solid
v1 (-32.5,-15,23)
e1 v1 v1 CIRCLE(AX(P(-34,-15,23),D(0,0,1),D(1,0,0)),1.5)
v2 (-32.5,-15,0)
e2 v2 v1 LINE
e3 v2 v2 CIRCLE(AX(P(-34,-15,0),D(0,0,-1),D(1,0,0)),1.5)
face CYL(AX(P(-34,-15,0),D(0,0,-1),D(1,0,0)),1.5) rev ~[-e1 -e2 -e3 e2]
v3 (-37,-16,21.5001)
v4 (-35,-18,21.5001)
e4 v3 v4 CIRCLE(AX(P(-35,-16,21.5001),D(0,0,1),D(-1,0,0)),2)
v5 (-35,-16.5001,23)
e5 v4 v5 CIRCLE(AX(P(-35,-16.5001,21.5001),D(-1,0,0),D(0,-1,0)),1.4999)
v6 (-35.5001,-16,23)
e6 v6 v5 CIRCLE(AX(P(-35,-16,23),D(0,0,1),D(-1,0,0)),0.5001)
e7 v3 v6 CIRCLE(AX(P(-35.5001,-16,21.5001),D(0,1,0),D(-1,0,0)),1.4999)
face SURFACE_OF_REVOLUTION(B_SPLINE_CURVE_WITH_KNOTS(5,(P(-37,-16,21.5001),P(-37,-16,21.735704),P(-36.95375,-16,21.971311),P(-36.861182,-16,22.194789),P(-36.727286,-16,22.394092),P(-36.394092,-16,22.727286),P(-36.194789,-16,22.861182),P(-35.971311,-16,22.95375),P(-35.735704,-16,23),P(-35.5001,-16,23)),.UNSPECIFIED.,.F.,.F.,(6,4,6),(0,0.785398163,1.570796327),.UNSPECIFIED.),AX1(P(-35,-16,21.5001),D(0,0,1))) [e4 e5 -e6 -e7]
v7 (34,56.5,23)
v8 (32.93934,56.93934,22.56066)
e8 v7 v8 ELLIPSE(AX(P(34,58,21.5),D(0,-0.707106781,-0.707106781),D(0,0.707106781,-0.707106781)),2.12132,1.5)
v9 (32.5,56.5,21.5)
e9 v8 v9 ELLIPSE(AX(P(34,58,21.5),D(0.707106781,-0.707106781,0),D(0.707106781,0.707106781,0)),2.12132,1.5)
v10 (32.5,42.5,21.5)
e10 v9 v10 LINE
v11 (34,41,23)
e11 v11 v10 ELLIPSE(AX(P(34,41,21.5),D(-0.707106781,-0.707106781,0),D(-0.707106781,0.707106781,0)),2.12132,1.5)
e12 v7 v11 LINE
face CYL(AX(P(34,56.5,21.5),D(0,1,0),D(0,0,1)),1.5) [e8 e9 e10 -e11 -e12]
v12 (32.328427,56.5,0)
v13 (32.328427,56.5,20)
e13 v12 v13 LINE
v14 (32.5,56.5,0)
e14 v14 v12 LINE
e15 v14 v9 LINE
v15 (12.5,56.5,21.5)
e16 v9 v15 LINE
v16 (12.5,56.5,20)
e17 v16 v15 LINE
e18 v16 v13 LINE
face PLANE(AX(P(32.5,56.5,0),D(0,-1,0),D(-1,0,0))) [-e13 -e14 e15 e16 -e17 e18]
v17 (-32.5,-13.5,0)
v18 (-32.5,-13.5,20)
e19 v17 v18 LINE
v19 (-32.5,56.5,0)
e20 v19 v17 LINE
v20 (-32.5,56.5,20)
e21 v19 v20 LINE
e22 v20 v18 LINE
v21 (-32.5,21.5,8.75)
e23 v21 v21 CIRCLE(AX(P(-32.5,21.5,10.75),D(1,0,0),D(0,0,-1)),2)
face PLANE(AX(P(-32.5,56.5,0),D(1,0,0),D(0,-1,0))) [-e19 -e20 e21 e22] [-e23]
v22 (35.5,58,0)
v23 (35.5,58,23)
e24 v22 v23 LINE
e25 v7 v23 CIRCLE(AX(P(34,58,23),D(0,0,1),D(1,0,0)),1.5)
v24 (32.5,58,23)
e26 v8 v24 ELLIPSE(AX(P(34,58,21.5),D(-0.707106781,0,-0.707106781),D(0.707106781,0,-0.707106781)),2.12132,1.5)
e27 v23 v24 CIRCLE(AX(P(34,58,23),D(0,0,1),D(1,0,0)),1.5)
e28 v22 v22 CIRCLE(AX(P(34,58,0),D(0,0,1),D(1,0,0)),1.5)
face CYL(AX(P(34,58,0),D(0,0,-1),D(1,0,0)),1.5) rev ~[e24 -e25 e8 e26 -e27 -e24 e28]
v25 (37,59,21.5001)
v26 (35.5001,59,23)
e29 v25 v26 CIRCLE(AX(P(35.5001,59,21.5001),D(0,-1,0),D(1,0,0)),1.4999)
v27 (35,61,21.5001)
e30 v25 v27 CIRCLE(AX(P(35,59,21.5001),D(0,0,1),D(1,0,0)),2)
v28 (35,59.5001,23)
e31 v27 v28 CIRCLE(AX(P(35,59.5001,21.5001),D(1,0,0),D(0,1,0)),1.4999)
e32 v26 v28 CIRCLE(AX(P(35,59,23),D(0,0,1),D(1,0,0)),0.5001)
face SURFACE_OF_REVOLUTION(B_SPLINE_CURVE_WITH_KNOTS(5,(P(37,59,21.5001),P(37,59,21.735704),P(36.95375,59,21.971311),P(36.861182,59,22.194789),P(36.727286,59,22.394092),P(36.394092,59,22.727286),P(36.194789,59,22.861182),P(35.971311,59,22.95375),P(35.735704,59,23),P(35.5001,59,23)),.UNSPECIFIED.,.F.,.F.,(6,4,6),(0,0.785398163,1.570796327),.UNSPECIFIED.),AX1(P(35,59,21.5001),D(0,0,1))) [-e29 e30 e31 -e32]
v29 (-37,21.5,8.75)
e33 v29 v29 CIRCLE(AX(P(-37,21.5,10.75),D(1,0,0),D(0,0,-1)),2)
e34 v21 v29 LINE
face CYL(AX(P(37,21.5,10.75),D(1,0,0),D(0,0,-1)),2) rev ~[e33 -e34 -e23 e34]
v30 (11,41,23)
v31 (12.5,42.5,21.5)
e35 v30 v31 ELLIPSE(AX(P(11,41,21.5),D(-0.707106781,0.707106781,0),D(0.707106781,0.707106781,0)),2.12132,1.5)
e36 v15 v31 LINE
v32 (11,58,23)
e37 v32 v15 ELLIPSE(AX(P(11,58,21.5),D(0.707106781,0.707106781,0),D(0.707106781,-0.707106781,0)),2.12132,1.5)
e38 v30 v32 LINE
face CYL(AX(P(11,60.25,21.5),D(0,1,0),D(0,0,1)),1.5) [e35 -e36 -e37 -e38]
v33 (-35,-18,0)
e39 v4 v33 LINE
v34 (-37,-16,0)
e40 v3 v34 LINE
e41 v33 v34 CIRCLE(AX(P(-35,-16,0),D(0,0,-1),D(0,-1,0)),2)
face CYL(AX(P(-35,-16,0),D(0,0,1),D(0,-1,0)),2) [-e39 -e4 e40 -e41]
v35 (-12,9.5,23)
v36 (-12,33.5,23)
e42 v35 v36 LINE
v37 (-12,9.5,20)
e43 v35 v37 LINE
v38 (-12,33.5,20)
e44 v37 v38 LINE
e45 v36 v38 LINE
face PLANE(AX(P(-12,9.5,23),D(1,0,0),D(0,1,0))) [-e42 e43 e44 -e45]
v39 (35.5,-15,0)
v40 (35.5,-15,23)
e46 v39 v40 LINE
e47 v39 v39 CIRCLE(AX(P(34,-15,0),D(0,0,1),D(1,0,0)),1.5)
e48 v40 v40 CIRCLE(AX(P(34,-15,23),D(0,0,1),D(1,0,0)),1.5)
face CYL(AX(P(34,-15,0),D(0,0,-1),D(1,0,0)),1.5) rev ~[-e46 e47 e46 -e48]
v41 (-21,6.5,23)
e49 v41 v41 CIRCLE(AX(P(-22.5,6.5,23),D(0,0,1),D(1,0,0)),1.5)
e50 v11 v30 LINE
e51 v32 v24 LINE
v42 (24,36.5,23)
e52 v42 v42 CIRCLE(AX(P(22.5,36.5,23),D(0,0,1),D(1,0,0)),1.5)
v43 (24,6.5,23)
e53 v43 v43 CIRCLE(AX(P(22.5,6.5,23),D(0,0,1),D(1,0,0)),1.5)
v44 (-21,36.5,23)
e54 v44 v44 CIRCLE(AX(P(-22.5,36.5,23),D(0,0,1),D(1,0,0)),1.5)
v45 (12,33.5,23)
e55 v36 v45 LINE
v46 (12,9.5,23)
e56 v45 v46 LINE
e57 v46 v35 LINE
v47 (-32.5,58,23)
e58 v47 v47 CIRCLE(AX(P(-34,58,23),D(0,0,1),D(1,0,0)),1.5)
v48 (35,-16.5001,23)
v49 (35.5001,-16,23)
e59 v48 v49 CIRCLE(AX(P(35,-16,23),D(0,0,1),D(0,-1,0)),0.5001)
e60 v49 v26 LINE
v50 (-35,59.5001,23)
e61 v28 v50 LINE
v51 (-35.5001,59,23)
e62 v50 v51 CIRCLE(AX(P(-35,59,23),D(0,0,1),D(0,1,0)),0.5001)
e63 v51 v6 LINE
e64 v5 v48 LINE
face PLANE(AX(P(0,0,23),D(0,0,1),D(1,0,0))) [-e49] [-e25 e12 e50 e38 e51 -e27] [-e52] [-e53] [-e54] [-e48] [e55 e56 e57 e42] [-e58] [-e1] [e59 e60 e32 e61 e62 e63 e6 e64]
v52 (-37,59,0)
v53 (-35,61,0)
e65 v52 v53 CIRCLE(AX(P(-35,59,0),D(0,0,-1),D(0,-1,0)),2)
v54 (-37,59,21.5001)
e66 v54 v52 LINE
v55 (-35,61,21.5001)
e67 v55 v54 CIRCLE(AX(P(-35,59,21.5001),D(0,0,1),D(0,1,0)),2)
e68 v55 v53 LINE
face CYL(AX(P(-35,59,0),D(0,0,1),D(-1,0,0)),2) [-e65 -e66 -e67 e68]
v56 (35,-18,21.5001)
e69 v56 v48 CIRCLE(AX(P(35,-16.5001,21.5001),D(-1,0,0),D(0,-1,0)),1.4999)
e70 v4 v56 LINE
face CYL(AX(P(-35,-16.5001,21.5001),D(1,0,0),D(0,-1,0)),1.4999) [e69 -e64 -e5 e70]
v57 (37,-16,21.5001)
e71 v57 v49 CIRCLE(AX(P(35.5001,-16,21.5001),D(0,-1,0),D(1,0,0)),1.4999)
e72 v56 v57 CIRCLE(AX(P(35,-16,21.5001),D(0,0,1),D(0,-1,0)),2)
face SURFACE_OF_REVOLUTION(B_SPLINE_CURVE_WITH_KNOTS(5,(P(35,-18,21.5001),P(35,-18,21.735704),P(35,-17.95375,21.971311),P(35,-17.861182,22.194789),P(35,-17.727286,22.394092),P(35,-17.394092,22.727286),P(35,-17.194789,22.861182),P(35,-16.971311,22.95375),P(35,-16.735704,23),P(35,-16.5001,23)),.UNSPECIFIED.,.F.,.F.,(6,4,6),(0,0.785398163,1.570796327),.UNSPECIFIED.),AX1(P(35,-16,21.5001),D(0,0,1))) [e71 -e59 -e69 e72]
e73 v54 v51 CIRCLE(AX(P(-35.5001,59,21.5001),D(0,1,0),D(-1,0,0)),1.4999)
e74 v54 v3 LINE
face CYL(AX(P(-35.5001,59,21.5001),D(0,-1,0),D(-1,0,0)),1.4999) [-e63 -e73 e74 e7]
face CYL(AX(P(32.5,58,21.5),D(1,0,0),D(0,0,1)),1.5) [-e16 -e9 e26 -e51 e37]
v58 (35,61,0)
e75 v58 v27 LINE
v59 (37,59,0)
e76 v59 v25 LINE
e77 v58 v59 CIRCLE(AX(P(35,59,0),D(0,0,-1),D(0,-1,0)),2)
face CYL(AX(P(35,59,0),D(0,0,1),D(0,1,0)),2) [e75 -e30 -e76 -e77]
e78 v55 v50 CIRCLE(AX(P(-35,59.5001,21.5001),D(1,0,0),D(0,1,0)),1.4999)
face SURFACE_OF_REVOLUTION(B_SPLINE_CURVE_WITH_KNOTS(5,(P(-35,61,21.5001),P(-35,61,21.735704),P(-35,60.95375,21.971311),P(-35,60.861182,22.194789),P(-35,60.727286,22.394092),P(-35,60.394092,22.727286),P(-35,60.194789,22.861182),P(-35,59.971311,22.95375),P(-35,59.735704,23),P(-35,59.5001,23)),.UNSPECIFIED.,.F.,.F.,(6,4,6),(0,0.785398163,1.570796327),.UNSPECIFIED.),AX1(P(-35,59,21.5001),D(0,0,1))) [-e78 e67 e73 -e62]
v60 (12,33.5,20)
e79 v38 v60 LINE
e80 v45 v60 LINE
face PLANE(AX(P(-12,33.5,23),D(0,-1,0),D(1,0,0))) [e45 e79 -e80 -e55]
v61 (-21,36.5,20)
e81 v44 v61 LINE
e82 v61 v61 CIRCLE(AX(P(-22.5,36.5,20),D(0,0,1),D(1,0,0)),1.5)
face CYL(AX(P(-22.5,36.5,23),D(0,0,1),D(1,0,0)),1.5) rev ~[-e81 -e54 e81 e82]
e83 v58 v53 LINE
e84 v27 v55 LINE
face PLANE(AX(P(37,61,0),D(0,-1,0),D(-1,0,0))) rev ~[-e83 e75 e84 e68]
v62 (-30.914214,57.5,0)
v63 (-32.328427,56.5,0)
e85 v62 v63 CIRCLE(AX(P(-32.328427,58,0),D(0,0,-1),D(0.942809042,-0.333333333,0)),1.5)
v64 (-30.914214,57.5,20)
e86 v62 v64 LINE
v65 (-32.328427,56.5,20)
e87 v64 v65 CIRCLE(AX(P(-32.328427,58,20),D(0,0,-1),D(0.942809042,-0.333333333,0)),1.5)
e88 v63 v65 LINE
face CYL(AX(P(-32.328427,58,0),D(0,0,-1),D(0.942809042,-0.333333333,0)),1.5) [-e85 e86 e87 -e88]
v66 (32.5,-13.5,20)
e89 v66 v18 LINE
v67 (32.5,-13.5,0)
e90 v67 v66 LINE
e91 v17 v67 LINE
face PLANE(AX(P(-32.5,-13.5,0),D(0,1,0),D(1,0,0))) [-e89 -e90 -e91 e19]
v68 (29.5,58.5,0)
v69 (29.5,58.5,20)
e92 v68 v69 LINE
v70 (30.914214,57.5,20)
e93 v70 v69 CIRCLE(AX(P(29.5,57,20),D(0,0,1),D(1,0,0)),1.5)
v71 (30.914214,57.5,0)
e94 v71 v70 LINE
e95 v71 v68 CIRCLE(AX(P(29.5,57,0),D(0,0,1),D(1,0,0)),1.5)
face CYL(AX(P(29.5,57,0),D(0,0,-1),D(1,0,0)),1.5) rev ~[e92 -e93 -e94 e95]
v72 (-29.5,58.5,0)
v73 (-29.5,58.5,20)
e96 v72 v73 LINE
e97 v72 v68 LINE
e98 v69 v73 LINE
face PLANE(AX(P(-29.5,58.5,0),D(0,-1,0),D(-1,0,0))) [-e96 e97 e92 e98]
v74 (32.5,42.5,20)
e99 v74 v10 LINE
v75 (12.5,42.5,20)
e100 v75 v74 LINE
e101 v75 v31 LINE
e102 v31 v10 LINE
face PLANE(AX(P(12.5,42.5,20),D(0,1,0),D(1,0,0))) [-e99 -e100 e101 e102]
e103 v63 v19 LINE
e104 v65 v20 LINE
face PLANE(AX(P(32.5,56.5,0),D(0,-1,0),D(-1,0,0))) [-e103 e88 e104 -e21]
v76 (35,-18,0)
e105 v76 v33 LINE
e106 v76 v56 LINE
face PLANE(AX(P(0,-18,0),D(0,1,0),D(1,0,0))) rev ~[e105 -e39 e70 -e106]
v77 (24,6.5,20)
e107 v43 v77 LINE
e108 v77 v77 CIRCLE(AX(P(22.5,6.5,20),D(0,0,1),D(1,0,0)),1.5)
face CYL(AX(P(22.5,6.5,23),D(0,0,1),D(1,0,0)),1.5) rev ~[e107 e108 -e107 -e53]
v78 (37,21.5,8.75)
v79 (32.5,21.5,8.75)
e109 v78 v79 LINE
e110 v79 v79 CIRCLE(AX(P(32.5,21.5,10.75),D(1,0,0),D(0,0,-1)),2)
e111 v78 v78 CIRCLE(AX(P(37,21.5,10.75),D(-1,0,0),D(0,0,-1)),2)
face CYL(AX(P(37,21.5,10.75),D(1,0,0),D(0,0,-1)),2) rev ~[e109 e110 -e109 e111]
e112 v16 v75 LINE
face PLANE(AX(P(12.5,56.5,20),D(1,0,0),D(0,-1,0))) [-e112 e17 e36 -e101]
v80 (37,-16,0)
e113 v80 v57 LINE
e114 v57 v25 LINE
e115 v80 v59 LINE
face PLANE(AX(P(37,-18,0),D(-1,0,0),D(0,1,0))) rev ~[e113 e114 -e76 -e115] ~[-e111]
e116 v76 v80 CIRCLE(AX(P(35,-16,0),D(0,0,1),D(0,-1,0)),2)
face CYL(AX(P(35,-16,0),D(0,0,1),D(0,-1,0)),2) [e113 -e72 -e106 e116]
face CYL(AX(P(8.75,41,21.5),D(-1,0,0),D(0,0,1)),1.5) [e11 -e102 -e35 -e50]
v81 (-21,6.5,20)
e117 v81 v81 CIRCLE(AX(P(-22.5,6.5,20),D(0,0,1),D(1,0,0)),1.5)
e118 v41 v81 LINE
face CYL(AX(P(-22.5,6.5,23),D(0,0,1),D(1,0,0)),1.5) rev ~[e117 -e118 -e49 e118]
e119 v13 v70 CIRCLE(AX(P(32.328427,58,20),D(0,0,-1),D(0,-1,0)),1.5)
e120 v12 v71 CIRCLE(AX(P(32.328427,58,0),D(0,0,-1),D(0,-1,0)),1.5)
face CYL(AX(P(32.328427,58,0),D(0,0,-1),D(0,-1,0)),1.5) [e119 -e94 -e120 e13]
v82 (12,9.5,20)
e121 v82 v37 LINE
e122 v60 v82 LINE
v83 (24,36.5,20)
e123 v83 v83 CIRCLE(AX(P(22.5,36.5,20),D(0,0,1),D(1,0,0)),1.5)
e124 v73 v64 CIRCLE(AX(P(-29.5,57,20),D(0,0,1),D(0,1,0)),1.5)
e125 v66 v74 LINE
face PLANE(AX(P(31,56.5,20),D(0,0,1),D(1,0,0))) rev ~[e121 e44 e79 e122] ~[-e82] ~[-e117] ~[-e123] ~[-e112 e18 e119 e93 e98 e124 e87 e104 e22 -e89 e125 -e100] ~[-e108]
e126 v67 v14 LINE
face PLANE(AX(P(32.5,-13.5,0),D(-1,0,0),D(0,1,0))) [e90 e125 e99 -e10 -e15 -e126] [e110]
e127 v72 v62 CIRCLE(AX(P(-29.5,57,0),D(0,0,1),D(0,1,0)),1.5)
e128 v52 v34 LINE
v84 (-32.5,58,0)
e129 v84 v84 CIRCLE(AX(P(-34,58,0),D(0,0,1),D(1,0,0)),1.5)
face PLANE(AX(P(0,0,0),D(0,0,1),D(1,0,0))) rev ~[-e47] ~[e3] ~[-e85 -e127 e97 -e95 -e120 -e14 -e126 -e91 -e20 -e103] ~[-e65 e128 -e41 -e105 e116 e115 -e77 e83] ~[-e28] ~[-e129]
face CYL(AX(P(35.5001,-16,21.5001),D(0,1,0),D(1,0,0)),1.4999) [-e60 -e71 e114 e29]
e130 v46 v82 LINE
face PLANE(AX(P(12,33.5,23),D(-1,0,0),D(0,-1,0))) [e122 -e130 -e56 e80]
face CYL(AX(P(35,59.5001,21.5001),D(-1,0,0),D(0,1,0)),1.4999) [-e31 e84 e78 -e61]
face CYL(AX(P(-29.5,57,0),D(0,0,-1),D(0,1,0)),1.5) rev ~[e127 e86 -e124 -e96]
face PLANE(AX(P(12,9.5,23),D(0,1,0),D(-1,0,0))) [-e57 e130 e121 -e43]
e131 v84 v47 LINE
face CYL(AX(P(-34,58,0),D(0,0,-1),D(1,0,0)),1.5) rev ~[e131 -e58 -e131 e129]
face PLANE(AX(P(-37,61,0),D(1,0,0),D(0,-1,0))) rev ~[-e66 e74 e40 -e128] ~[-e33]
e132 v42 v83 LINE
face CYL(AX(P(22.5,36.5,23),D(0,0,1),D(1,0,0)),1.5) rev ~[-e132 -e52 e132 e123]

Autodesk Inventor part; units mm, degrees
ref_plane "YZ Plane" through (0, 0, 0) normal (1, 0, 0) x (0, 1, 0)
ref_plane "XZ Plane" through (0, 0, 0) normal (0, 1, 0) x (-1, 0, 0)
ref_plane "XY Plane" through (0, 0, 0) normal (0, 0, 1) x (1, 0, 0)
sketch "Sketch2" plane through (0, 0, 0) normal (0, 0, 1) x (1, 0, 0)
  line L0 (0, -40) -> (0, -15)
  line L1 (0, -15) -> (-34, -15)
  line L2 (-34, -15) -> (-34, 58)
  line L3 (-34, 58) -> (34, 58)
  line L4 (34, 58) -> (34, -15)
  line L5 (34, -15) -> (0, -15)
  circle A0 centre (-34, 58) radius 1.5
  circle A1 centre (34, 58) radius 1.5
  circle A2 centre (-34, -15) radius 1.5
  circle A3 centre (34, -15) radius 1.5
  line L6 (32.5, 56.5) -> (-32.5, 56.5)
  line L7 (-32.5, 56.5) -> (-32.5, -13.5)
  line L8 (-32.5, -13.5) -> (0, -13.5)
  line L9 (0, -13.5) -> (32.5, -13.5)
  line L10 (32.5, -13.5) -> (32.5, 56.5)
  line L11 (37, -18) -> (37, 61)
  line L12 (37, 61) -> (-37, 61)
  line L13 (-37, 61) -> (-37, -18)
  line L14 (-37, -18) -> (0, -18)
  line L15 (0, -18) -> (37, -18)
  point P0 (0, 0)
  dimension "d0" = 25
  dimension "d1" = 34
  dimension "d3" = 68
  dimension "d4" = 3
  dimension "d5" = 3
  dimension "d6" = 3
  dimension "d11" = 1.5
  dimension "d13" = 3
extrude "Extrusion1" add sketch "Sketch2" along normal blind 20 contours L1 A2 L2 A0 L3 A1 L4 A3 L5 | L15 L14 L13 L12 L11
fillet "Fillet1" radius 2 4 edges at (37, -18, 10) (37, 61, 10) (-37, 61, 10) (-37, -18, 10)
sketch "Sketch3" plane through (0, 0, 20) normal (0, 0, 1) x (1, 0, 0)
  arc A0 (-37, -16) -> (-35, -18) centre (-35, -16) ccw projected
  line L0 (-35, -18) -> (35, -18) projected
  arc A1 (35, -18) -> (37, -16) centre (35, -16) ccw projected
  line L1 (37, -16) -> (37, 59) projected
  arc A2 (37, 59) -> (35, 61) centre (35, 59) ccw projected
  line L2 (35, 61) -> (-35, 61) projected
  arc A3 (-35, 61) -> (-37, 59) centre (-35, 59) ccw projected
  line L3 (-37, 59) -> (-37, -16) projected
  circle A4 centre (34, -15) radius 1.5 projected
  circle A5 centre (-34, -15) radius 1.5 projected
  circle A6 centre (-34, 58) radius 1.5 projected
  line L4 (32.5, 56.5) -> (32.5, -13.5) projected
  line L5 (32.5, -13.5) -> (-32.5, -13.5) projected
  line L6 (-32.5, -13.5) -> (-32.5, 56.5) projected
  line L7 (-32.5, 56.5) -> (32.5, 56.5) projected
  circle A7 centre (34, 58) radius 1.5 projected
  point P0 (0, 0)
extrude "Extrusion2" add sketch "Sketch3" along normal blind 3 contours L3 A3 L2 A2 L1 A1 L0 A0 | L4 L5 L6 L7
fillet "Fillet2" radius 1.5 8 edges at (36.4142, 60.4142, 23) (0, 61, 23) (-36.4142, 60.4142, 23) (-37, 21.5, 23) (-36.4142, -17.4142, 23) (0, -18, 23) (36.4142, -17.4142, 23) (37, 21.5, 23)
sketch "Sketch4" plane through (0, 0, 20) normal (0, 0, -1) x (-1, 0, 0)
  line L0 (-32.5, 56.5) -> (-32.5, -13.5) projected
  line L1 (-32.5, 56.5) -> (-12.5, 56.5)
  line L2 (32.5, 56.5) -> (-32.5, 56.5) projected
  line L3 (-12.5, 56.5) -> (-12.5, 42.5)
  line L4 (-12.5, 42.5) -> (-32.5, 42.5)
  point P0 (0, 0)
  dimension "d18" = 20
  dimension "d19" = 14
extrude "Extrusion3" cut sketch "Sketch4" against normal blind 3
fillet "Fillet3" radius 1.5 4 edges at (12.5, 49.5, 23) (22.5, 56.5, 23) (32.5, 49.5, 23) (22.5, 42.5, 23)
sketch "Sketch6" plane through (0, 0, 23) normal (0, 0, 1) x (1, 0, 0)
  line L0 (34, -16.5) -> (-34, -16.5) projected
  line L1 (-35.5, -15) -> (-35.5, 58) projected
  line L2 (0, 21.5) -> (0, 36.5)
  line L3 (0, 36.5) -> (-15, 36.5)
  line L4 (-15, 36.5) -> (-15, 6.5)
  line L5 (-15, 6.5) -> (15, 6.5)
  line L6 (15, 6.5) -> (15, 36.5)
  line L7 (15, 36.5) -> (0, 36.5)
  line L8 (-12, 33.5) -> (0, 33.5)
  line L9 (0, 33.5) -> (12, 33.5)
  line L10 (12, 33.5) -> (12, 9.5)
  line L11 (12, 9.5) -> (-12, 9.5)
  line L12 (-12, 9.5) -> (-12, 33.5)
  line L13 (-15, 36.5) -> (-22.5, 36.5)
  circle A0 centre (-22.5, 36.5) radius 1.5
  circle A1 centre (-22.5, 6.5) radius 1.5
  circle A2 centre (22.5, 36.5) radius 1.5
  circle A3 centre (22.5, 6.5) radius 1.5
  dimension "d33" = 15
  dimension "d34" = 15
  dimension "d35" = 30
  dimension "d36" = 30
  dimension "d37" = 3
  dimension "d38" = 7.5
  dimension "d39" = 3
  dimension "d40" = 3
extrude "Extrusion5" cut sketch "Sketch6" against normal blind 5 contours L8 L9 L10 L11 L12 | A0 | A1 | A2 | A3
sketch "Sketch7" plane through (0, 0, 0) normal (0, 0, -1) x (-1, 0, 0)
  line L0 (32.5, -13.5) -> (32.5, 56.5) projected
  line L1 (32.5, 56.5) -> (27.5, 56.5)
  line L2 (32.5, 56.5) -> (-32.5, 56.5) projected
  line L3 (27.5, 56.5) -> (29.5, 56.5)
  line L4 (29.5, 56.5) -> (29.5, 58.5)
  line L5 (29.5, 58.5) -> (25.5, 58.5)
  line L6 (25.5, 58.5) -> (25.5, 56.5)
  line L7 (29.5, 58.5) -> (31, 58.5)
  line L8 (31, 58.5) -> (31, 56.5)
  line L9 (25.5, 58.5) -> (24, 58.5)
  line L10 (24, 58.5) -> (24, 56.5)
  line L11 (0, 56.5) -> (0, 48.9008)
  line L12 (-32.5, 56.5) -> (-27.5, 56.5)
  line L13 (-32.5, 56.5) -> (32.5, 56.5)
  line L14 (-27.5, 56.5) -> (-29.5, 56.5)
  line L15 (-29.5, 56.5) -> (-29.5, 58.5)
  line L16 (-29.5, 58.5) -> (-25.5, 58.5)
  line L17 (-25.5, 58.5) -> (-25.5, 56.5)
  line L18 (-29.5, 58.5) -> (-31, 58.5)
  line L19 (-31, 58.5) -> (-31, 56.5)
  line L20 (-25.5, 58.5) -> (-24, 58.5)
  line L21 (-24, 58.5) -> (-24, 56.5)
  line L22 (24, 58.5) -> (-24, 58.5)
  point P0 (0, 0)
  dimension "d44" = 5
  dimension "d45" = 2
  dimension "d46" = 2
  dimension "d47" = 4
  dimension "d48" = 1.5
  dimension "d49" = 1.5
extrude "Extrusion6" cut sketch "Sketch7" against normal up to surface (20 mm away)
fillet "Fillet5" radius 1.5 4 edges at (31, 58.5, 10) (31, 56.5, 10) (-31, 58.5, 10) (-31, 56.5, 10)
sketch "Sketch8" plane through (37, -16, 0) normal (1, 0, 0) x (0, 0, -1)
  line L0 (0, 77) -> (-21.5, 77) projected
  line L1 (-10.75, 77) -> (-10.75, -2)
  line L2 (-21.5, -2) -> (0, -2) projected
  circle A0 centre (-10.75, 37.5) radius 2
  point P0 (0, 16)
  dimension "d54" = 4
extrude "Extrusion7" cut sketch "Sketch8" against normal through all
properties part number "manta ray battery pack"
